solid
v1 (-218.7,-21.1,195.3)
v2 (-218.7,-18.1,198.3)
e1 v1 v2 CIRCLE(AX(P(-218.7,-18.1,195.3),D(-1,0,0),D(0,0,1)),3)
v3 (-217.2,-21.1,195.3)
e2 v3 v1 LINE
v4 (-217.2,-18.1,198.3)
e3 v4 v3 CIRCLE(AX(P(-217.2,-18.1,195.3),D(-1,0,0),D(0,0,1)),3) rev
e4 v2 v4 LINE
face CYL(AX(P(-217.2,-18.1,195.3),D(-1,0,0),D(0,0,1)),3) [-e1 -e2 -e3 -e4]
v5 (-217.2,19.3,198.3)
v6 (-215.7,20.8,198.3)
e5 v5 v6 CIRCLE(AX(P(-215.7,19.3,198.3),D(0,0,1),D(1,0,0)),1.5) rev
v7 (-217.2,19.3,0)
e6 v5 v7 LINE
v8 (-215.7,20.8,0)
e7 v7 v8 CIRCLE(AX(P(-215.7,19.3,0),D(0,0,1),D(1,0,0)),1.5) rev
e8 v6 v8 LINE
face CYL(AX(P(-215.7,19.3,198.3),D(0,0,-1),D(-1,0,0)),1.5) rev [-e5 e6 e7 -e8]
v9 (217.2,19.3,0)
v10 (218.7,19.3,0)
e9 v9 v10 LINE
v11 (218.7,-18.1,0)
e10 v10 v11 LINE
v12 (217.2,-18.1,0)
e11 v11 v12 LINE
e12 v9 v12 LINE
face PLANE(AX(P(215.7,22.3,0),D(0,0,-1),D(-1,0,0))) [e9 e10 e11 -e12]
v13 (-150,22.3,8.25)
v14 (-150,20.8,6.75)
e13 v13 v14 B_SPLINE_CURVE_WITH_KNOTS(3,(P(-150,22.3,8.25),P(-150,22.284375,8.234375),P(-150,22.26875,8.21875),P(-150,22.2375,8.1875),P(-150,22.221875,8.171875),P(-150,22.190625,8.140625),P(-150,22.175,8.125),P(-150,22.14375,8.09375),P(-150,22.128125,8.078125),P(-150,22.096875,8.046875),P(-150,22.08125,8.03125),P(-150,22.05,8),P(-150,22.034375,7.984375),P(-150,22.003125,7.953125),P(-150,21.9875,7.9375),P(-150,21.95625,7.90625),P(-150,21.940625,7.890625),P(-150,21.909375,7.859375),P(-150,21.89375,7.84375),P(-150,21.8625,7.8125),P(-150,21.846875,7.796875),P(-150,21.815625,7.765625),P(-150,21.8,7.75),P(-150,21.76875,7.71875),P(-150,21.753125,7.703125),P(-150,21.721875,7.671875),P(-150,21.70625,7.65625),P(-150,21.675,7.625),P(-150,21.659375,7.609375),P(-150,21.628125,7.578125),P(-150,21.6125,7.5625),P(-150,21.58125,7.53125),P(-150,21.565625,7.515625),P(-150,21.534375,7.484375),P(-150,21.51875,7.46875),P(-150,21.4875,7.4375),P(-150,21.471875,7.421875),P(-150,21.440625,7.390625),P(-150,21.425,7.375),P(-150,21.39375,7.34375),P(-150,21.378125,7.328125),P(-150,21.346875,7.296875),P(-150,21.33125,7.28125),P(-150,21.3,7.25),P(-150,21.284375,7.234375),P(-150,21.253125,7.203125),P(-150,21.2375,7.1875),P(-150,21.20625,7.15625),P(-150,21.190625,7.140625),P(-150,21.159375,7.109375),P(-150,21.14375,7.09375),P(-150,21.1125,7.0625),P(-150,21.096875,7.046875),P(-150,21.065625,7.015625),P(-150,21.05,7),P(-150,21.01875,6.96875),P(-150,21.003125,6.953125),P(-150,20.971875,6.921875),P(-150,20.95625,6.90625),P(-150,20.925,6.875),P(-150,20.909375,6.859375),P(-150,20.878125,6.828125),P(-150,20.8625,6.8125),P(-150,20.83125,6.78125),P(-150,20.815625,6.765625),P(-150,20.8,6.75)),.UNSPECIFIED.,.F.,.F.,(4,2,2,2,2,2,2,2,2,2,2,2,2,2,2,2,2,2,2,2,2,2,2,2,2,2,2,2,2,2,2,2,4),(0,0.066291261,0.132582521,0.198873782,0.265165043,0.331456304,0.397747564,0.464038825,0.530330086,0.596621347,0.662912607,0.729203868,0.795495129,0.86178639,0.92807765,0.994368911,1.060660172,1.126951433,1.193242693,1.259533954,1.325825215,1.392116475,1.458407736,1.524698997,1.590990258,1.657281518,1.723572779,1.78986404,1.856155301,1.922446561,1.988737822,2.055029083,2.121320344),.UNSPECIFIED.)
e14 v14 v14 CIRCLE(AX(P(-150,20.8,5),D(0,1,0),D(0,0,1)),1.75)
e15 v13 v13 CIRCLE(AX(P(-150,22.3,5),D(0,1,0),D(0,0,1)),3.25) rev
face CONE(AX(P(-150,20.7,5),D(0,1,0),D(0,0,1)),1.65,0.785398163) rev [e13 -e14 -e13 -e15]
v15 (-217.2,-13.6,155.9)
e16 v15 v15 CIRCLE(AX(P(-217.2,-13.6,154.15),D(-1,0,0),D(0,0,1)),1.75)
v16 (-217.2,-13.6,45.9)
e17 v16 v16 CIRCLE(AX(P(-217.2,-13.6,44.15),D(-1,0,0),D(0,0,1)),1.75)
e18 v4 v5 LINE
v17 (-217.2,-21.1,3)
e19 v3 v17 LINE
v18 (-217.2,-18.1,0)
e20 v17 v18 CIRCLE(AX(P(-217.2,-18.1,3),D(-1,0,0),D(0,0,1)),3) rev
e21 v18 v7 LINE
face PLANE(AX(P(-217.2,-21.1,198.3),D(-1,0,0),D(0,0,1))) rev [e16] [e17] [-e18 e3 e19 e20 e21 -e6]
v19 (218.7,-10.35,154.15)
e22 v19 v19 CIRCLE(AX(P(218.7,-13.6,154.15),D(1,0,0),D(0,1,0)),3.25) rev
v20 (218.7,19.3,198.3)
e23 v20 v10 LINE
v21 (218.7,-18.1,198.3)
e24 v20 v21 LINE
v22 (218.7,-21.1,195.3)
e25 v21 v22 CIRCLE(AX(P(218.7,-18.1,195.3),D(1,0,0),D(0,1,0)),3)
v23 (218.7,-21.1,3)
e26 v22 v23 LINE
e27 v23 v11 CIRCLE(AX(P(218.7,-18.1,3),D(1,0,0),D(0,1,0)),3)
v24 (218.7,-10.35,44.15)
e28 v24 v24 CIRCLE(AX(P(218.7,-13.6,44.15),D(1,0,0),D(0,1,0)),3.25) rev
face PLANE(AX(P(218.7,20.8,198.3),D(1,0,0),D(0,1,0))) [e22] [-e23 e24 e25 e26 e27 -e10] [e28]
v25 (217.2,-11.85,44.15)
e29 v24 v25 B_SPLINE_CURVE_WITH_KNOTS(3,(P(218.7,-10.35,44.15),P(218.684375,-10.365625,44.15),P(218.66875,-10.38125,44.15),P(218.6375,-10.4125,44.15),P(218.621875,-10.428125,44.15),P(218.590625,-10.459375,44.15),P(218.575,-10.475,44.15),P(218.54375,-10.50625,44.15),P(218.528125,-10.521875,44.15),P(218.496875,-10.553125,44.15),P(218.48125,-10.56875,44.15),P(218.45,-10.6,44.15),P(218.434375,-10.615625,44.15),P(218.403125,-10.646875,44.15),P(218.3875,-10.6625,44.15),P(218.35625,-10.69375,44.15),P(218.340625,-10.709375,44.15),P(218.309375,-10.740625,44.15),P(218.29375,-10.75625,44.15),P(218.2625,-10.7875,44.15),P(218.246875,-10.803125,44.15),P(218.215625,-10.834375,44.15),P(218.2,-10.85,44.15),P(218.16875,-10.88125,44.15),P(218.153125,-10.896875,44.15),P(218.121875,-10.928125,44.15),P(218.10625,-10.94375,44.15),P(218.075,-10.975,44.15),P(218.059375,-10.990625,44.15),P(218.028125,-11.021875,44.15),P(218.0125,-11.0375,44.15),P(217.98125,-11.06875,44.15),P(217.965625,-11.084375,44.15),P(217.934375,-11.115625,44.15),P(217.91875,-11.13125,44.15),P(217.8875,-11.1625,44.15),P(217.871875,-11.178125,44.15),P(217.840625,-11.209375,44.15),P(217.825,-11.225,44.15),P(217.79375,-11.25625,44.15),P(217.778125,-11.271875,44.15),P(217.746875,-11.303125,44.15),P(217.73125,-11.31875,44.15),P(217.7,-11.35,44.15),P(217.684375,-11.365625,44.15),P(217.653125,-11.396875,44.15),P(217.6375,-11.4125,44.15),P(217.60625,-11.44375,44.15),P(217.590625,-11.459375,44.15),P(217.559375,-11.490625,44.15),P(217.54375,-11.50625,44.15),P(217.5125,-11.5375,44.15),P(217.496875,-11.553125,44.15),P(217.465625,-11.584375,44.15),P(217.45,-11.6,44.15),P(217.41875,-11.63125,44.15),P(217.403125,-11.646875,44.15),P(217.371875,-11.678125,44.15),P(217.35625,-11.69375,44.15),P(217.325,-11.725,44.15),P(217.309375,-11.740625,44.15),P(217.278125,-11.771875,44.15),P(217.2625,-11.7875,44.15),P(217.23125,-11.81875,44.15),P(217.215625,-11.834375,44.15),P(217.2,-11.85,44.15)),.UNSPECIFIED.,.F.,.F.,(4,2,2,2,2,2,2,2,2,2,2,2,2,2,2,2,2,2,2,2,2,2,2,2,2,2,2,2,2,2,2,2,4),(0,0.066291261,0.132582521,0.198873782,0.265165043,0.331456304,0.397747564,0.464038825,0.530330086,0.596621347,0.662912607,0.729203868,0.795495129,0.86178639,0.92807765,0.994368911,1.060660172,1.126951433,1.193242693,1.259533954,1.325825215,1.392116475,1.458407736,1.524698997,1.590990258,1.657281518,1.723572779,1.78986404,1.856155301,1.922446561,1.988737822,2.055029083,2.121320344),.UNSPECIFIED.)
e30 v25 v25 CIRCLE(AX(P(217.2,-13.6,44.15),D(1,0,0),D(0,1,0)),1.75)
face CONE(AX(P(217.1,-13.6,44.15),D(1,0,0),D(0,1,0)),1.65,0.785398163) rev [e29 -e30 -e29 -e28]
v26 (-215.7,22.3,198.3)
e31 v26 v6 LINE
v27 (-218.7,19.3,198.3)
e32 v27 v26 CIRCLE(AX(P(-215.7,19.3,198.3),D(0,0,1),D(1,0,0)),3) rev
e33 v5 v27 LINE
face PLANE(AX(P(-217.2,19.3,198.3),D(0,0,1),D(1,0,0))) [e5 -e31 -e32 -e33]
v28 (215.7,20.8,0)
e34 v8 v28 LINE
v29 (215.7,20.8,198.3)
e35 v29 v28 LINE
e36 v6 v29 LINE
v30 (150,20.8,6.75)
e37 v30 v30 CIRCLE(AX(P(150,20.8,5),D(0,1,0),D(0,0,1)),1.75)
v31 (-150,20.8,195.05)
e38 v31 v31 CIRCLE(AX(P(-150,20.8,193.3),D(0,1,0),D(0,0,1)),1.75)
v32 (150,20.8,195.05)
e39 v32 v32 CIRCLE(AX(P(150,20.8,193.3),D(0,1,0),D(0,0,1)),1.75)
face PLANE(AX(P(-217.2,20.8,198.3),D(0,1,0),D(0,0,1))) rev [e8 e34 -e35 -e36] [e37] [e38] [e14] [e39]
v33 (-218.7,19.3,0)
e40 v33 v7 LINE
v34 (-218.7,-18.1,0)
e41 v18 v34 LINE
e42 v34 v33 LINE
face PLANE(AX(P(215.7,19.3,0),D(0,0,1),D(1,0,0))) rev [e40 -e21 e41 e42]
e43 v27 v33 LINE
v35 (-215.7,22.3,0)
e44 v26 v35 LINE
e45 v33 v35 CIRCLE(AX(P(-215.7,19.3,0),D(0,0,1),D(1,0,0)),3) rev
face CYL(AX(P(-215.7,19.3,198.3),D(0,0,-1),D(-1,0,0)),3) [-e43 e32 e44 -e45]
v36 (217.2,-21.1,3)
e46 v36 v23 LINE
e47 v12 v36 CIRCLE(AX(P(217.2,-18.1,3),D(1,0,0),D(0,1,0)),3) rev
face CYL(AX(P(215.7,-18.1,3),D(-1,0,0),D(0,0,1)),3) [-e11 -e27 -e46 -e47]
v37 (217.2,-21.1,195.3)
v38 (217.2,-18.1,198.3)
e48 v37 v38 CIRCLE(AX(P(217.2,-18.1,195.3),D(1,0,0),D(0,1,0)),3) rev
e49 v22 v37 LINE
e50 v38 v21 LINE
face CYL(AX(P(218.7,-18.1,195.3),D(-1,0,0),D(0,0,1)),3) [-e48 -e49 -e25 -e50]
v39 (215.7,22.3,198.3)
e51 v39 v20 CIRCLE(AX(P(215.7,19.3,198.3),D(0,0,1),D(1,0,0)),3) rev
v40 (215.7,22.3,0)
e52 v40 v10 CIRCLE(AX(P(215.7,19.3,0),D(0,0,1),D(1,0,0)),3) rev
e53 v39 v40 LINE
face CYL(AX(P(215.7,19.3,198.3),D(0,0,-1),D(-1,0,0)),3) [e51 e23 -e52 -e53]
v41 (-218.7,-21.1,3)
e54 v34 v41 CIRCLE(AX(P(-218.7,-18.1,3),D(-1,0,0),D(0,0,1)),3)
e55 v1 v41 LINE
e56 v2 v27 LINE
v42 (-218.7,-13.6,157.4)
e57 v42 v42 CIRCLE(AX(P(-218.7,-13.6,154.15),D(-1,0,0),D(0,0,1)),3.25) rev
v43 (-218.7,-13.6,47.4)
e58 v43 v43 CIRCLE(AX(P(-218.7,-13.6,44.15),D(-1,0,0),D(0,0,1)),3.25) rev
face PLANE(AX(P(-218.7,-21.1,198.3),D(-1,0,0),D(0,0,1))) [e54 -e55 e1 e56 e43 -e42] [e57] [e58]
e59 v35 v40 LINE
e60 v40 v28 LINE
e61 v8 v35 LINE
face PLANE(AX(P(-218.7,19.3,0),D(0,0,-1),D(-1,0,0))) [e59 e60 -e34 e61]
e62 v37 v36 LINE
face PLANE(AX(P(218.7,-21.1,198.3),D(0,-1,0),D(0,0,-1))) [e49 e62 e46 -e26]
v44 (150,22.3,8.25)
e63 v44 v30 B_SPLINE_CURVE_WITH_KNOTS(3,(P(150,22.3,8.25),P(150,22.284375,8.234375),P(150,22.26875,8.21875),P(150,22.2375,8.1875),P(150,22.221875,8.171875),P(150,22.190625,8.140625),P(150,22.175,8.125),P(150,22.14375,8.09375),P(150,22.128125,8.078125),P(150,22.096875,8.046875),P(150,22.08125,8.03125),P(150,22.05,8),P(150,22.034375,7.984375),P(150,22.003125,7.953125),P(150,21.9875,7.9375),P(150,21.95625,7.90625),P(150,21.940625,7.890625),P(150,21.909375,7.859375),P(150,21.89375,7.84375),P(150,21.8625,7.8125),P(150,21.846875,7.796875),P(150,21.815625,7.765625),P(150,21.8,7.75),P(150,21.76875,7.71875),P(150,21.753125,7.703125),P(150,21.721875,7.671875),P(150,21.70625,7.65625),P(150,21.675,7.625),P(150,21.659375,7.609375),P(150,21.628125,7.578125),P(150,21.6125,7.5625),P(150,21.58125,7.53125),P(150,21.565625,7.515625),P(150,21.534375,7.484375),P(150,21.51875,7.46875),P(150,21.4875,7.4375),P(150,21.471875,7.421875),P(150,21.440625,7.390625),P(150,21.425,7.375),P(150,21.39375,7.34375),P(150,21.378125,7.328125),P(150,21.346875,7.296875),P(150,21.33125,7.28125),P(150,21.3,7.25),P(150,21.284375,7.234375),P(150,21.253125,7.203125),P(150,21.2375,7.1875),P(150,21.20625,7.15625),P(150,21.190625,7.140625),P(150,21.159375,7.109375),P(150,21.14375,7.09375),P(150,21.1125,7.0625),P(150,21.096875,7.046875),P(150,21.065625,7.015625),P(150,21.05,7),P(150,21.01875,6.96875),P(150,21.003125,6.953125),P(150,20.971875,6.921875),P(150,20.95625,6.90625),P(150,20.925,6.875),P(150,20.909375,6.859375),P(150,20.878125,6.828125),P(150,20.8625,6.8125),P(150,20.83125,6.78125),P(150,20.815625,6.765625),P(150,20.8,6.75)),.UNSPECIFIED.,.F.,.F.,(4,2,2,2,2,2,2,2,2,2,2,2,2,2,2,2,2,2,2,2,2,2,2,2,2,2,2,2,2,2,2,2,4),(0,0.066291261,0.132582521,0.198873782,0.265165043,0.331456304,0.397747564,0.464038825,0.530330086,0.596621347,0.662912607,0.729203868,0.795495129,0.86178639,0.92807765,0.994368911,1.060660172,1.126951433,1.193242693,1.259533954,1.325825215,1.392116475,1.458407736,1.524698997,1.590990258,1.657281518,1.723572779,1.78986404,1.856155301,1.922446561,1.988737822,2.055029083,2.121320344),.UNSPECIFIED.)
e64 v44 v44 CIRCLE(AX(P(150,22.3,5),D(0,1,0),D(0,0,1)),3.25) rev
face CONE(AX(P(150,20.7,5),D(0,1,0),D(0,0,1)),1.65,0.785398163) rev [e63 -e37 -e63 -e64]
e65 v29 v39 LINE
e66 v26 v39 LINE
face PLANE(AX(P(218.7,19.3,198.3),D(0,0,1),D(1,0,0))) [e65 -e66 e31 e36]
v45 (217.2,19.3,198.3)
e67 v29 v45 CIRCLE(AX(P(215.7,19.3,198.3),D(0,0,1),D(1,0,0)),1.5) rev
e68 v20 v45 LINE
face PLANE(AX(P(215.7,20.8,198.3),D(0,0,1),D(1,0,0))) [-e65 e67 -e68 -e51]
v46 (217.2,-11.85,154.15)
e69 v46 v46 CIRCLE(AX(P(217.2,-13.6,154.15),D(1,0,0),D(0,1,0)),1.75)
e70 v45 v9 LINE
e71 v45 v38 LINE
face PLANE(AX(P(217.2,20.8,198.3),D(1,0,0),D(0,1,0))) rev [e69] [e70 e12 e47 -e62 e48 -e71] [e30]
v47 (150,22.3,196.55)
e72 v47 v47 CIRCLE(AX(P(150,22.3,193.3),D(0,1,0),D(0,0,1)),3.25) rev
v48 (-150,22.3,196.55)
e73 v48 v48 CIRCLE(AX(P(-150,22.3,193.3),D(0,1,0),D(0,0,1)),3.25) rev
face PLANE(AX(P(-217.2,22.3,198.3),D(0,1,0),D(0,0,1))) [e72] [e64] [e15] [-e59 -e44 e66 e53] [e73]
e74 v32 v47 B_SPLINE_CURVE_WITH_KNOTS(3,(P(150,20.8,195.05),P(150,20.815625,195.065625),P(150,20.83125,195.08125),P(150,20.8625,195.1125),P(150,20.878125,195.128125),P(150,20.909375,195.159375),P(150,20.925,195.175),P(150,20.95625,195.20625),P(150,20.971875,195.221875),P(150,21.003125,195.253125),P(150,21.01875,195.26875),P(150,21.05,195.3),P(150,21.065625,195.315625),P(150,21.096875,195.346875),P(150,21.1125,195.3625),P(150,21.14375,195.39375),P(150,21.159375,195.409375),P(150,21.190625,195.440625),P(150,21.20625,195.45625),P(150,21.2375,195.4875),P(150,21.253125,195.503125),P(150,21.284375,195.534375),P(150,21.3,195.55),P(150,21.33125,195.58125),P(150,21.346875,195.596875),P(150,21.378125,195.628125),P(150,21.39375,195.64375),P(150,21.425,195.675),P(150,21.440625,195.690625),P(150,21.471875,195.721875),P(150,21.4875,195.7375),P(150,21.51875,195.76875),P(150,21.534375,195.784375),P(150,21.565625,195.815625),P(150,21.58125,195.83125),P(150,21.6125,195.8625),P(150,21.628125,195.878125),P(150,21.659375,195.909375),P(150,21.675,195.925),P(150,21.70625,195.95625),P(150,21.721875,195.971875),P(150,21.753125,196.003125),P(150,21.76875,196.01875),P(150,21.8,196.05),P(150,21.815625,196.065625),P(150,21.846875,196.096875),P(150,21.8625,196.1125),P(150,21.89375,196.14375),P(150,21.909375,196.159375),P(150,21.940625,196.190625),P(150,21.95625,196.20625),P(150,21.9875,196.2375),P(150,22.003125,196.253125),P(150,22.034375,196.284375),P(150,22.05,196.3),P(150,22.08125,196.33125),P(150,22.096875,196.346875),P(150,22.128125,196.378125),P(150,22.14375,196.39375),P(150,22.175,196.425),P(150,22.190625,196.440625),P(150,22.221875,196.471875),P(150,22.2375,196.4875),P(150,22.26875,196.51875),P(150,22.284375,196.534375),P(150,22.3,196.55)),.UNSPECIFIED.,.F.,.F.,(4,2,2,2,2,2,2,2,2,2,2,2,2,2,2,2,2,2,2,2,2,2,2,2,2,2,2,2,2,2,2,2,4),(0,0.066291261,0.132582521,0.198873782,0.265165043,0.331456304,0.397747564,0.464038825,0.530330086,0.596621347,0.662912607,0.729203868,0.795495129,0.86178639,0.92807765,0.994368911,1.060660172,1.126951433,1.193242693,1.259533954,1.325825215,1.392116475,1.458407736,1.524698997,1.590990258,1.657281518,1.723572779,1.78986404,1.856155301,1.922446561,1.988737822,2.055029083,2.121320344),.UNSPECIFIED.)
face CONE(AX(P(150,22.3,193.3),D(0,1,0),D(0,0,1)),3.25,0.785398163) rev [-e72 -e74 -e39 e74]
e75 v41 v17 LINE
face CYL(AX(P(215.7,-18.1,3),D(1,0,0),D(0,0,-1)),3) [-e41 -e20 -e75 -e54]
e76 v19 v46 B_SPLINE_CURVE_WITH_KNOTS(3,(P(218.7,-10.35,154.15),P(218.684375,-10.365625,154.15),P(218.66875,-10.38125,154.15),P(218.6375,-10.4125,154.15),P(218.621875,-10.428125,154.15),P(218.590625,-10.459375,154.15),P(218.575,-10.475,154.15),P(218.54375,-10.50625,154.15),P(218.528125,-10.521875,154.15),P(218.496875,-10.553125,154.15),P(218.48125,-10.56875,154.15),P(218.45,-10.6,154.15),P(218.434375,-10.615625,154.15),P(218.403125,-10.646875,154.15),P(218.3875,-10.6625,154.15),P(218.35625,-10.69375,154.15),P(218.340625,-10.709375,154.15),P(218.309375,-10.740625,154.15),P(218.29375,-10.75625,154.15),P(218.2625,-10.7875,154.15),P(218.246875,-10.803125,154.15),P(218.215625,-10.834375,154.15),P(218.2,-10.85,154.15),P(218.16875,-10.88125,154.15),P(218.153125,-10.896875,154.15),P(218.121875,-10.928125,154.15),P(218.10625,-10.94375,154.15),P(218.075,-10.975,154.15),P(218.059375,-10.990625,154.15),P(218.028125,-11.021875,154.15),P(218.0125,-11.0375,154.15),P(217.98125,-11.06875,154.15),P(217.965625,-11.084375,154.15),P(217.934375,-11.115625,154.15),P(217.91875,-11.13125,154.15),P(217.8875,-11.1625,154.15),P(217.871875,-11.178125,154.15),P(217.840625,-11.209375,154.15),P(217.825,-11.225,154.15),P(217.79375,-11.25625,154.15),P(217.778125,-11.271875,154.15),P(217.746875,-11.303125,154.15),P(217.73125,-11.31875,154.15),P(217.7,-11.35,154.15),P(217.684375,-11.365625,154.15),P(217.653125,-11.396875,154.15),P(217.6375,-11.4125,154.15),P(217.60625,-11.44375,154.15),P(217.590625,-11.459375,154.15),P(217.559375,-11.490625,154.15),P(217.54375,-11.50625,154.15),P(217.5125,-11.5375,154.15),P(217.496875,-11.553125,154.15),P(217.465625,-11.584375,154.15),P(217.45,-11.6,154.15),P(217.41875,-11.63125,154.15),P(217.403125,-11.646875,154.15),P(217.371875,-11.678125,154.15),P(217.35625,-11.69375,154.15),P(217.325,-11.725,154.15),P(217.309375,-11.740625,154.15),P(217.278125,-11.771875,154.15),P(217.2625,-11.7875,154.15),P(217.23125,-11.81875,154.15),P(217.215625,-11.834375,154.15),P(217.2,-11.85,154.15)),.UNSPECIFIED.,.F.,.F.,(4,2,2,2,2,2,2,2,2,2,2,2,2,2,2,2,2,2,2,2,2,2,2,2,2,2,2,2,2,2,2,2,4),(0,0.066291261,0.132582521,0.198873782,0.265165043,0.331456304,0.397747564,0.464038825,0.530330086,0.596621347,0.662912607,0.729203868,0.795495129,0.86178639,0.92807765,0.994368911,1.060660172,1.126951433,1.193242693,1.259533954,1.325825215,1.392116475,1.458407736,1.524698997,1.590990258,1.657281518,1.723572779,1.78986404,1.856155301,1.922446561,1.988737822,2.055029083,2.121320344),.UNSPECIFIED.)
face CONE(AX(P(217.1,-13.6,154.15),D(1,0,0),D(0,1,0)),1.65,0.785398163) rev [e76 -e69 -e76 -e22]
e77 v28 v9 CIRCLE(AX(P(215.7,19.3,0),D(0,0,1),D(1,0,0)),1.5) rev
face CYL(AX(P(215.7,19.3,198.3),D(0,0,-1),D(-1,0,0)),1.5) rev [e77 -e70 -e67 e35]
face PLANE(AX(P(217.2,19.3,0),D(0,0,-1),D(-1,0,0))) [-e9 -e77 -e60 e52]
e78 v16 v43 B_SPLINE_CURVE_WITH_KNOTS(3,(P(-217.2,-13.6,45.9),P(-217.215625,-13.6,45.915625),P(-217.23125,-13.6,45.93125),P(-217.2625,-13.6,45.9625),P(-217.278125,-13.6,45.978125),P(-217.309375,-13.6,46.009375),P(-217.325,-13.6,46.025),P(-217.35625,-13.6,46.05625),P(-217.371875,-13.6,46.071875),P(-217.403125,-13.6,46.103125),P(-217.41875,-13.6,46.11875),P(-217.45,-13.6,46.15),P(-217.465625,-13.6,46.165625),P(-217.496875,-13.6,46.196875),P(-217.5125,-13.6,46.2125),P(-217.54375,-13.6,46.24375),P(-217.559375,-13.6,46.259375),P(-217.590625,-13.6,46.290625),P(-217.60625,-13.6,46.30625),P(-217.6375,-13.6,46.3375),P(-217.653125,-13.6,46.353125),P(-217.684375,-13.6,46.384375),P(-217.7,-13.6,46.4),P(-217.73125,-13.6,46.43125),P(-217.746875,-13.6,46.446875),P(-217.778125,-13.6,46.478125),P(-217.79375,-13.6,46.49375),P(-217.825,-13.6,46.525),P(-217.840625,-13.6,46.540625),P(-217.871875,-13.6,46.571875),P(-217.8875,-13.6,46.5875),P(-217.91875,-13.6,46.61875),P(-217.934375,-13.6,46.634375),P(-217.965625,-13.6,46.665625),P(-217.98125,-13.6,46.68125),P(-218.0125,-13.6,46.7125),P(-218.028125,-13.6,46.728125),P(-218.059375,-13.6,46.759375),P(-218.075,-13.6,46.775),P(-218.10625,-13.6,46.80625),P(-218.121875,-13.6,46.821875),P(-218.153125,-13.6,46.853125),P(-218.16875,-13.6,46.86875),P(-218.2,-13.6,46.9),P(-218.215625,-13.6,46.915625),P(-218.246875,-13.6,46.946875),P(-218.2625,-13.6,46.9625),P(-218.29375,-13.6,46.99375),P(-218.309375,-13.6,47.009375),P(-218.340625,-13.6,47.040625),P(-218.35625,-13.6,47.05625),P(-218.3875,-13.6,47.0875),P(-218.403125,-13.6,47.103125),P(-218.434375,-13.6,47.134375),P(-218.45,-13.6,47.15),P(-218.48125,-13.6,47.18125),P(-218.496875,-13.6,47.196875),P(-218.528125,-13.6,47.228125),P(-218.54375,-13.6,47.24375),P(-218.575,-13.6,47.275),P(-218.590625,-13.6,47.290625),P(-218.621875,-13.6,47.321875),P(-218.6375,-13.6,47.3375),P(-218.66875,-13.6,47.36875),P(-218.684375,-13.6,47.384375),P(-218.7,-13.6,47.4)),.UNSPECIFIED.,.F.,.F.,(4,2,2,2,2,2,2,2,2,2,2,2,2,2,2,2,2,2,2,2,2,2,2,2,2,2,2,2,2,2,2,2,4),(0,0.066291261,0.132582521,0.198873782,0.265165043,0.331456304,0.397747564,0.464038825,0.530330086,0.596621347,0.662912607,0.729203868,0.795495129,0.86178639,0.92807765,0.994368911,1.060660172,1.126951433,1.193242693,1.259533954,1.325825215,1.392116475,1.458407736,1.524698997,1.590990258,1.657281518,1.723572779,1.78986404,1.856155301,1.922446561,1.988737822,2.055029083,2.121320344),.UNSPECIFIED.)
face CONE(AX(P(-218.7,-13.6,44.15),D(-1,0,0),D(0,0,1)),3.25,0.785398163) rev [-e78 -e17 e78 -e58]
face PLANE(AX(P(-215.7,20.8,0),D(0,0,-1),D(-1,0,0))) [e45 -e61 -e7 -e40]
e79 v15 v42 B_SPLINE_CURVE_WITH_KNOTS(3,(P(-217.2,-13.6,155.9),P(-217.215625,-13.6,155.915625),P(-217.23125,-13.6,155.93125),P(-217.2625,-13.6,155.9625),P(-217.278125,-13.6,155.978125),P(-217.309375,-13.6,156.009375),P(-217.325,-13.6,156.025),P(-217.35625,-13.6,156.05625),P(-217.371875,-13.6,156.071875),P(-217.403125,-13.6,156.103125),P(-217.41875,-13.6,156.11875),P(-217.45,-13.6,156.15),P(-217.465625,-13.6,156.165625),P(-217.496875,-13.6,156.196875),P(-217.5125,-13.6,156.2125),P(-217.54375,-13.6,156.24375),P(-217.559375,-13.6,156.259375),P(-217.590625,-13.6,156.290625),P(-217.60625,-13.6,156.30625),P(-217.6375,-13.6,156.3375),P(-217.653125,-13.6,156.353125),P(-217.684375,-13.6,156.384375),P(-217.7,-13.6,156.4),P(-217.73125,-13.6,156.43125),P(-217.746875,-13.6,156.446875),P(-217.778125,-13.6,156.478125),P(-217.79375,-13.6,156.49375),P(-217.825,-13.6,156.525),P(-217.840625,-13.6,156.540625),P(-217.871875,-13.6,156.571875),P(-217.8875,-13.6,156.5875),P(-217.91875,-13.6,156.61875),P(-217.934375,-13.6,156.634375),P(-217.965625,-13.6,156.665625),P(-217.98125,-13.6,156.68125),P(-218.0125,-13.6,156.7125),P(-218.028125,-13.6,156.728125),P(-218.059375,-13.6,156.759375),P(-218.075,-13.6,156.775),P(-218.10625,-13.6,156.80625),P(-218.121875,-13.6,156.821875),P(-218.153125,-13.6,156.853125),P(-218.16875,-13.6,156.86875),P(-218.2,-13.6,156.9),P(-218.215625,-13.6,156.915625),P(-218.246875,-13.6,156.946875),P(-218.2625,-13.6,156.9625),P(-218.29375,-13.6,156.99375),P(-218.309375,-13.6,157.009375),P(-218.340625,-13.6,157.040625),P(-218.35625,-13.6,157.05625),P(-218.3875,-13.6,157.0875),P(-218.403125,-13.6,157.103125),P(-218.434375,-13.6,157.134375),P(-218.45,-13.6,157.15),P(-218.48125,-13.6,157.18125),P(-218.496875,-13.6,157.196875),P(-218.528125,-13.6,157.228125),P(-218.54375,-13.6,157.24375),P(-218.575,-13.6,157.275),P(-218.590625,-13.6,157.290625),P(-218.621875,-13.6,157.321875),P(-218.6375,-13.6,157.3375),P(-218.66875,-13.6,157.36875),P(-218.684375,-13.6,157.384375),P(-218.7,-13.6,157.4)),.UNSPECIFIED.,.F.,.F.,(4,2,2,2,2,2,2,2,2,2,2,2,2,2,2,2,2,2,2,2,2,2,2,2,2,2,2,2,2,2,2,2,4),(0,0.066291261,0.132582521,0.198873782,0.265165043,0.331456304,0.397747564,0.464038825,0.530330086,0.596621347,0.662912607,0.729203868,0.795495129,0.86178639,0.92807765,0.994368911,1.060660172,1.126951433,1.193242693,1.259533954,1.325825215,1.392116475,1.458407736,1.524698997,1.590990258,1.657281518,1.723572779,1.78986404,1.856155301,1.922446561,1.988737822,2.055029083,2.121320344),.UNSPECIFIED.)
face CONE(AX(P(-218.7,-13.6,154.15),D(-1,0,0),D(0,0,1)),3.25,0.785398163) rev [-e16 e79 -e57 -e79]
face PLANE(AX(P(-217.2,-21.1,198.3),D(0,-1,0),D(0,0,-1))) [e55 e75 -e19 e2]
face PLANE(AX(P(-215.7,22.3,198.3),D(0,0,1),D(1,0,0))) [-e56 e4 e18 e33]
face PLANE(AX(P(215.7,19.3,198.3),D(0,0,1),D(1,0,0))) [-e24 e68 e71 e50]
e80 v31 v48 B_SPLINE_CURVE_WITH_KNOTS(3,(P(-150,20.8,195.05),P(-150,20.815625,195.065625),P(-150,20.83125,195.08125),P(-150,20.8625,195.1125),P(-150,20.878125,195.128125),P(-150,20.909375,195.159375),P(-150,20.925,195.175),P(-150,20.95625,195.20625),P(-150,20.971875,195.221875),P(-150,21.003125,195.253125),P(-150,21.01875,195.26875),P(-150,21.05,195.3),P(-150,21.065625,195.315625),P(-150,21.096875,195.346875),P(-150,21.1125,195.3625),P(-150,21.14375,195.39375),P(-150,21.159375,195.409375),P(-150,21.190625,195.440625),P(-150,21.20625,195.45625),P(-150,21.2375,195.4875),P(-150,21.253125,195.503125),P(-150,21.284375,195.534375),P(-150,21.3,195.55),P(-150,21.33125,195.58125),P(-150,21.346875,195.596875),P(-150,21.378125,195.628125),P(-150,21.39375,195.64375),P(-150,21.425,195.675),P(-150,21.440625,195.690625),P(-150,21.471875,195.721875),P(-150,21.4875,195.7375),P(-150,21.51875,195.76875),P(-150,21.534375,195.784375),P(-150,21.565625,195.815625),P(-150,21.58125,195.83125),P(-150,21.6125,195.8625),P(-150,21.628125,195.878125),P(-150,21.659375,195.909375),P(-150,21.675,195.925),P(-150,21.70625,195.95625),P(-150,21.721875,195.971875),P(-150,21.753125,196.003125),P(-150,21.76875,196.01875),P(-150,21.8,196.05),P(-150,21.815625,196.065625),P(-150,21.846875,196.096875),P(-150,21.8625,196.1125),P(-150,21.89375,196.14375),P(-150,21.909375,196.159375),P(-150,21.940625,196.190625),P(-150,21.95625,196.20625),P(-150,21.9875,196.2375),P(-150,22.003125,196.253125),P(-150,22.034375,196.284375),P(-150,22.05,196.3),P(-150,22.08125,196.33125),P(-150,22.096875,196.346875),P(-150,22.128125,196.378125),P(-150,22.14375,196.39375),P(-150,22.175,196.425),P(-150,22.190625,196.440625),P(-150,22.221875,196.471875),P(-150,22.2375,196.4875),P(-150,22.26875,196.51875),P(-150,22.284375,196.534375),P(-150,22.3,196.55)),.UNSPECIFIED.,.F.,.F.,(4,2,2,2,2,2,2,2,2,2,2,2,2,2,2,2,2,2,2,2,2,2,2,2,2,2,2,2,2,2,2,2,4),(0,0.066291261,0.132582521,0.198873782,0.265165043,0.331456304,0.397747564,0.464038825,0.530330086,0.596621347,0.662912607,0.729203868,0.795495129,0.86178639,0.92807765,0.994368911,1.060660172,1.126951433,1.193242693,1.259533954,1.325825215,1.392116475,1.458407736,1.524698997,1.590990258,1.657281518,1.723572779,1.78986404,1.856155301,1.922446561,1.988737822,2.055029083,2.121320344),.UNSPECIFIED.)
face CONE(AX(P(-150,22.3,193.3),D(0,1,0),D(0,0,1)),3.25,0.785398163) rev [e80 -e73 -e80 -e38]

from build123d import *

# Parameters (mm, degrees)
SM_BASE_FLANGE_1_DEPTH = 198.3
FILLET_1_R             = 3
SKETCH_6_R             = 1.65
CUT_EXTRUDE_1_DEPTH    = 299.389242433
CUT_EXTRUDE_2_REACH    = 482.769
SKETCH_7_R             = 1.65
CHAMFER_2_SIZE         = 1.6


# Sheet-metal steps are written as plain solids
with BuildPart() as part:
    # Sketch 1 → Базовая кромка1 (new body)
    with BuildSketch(Plane.XY):
        with BuildLine():
            Line((-217.2, -21.1), (-217.2, 19.3))
            ThreePointArc((-217.2, 19.3), (-216.760660172, 20.360660172), (-215.7, 20.8))
            Line((-215.7, 20.8), (215.7, 20.8))
            ThreePointArc((215.7, 20.8), (216.760660172, 20.360660172), (217.2, 19.3))
            Line((217.2, 19.3), (217.2, -21.1))
            Line((217.2, -21.1), (218.7, -21.1))
            Line((218.7, -21.1), (218.7, 19.3))
            ThreePointArc((218.7, 19.3), (217.821320344, 21.421320344), (215.7, 22.3))
            Line((215.7, 22.3), (-215.7, 22.3))
            ThreePointArc((-215.7, 22.3), (-217.821320344, 21.421320344), (-218.7, 19.3))
            Line((-218.7, 19.3), (-218.7, -21.1))
            Line((-218.7, -21.1), (-217.2, -21.1))
        make_face()
    extrude(amount=SM_BASE_FLANGE_1_DEPTH)

    # Скругление1
    fillet_1_edges = [part.edges().sort_by_distance(p)[0] for p in [
        (-217.95, -21.1, 0),
        (217.95, -21.1, 0),
        (-217.95, -21.1, 198.3),
        (217.95, -21.1, 198.3),
    ]]
    fillet(fillet_1_edges, radius=FILLET_1_R)

    # Эскиз6 → Вырез-Вытянуть1 (cut, through all)
    with BuildSketch(Plane(origin=(0, 22.3, 0), x_dir=(1, 0, 0), z_dir=(0, 1, 0))):
        with Locations(Location((-150, -5, 0), (0, 0, 270))):
            Circle(SKETCH_6_R)
        with Locations(Location((150, -5, 0), (0, 0, 270))):
            Circle(SKETCH_6_R)
    cut_extrude_1 = extrude(amount=-CUT_EXTRUDE_1_DEPTH, mode=Mode.SUBTRACT)

    # Зеркальное отражение1: Вырез-Вытянуть1 across plane
    add(cut_extrude_1.mirror(Plane(origin=(0, 0, 99.15), x_dir=(1, 0, 0), z_dir=(0, 0, -1))), mode=Mode.SUBTRACT)

    # Вырез-Вытянуть2: up to this face of the body (flat: up to its plane)
    cut_extrude_2_end = Plane(part.part.faces().sort_by_distance((-218.7, -0.890578691, 99.15))[0])
    # Эскиз7 → Вырез-Вытянуть2 (cut, up to the picked face)
    with BuildSketch(Plane(origin=(218.7, 0, 0), x_dir=(0, 0, -1), z_dir=(1, 0, 0)), mode=Mode.PRIVATE) as cut_extrude_2_sk1:
        with Locations(Location((-154.15, -13.6, 0), (0, 0, 90))):
            Circle(SKETCH_7_R)
    cut_extrude_2_tool1 = split(extrude(cut_extrude_2_sk1.sketch, amount=-CUT_EXTRUDE_2_REACH, mode=Mode.PRIVATE), bisect_by=cut_extrude_2_end, keep=Keep.BOTH, mode=Mode.PRIVATE)
    # Эскиз7 → Вырез-Вытянуть2 (cut, up to the picked face)
    with BuildSketch(Plane(origin=(218.7, 0, 0), x_dir=(0, 0, -1), z_dir=(1, 0, 0)), mode=Mode.PRIVATE) as cut_extrude_2_sk2:
        with Locations(Location((-44.15, -13.6, 0), (0, 0, 90))):
            Circle(SKETCH_7_R)
    cut_extrude_2_tool2 = split(extrude(cut_extrude_2_sk2.sketch, amount=-CUT_EXTRUDE_2_REACH, mode=Mode.PRIVATE), bisect_by=cut_extrude_2_end, keep=Keep.BOTH, mode=Mode.PRIVATE)
    add(cut_extrude_2_tool1.solids().sort_by(Axis((218.7, -13.6, 154.15), (-1, 0, 0)))[0], mode=Mode.SUBTRACT)
    add(cut_extrude_2_tool2.solids().sort_by(Axis((218.7, -13.6, 44.15), (-1, 0, 0)))[0], mode=Mode.SUBTRACT)

    # Фаска2
    # the kernel refuses this chamfer: 1.6 mm, written as the material it takes off along each edge
    with BuildSketch(Plane(origin=(-218.7, -13.6, 44.15), x_dir=(0, 1, 0), z_dir=(0, 0, -1))) as chamfer_2_piece_1:
        Polygon((1.65 + CHAMFER_2_SIZE, 0), (1.65, CHAMFER_2_SIZE), (1.65, 0), align=None)
    revolve(axis=Axis((-218.7, -13.6, 44.15), (1, 0, 0)), mode=Mode.SUBTRACT)
    with BuildSketch(Plane(origin=(-218.7, -13.6, 154.15), x_dir=(0, 1, 0), z_dir=(0, 0, -1))) as chamfer_2_piece_2:
        Polygon((1.65 + CHAMFER_2_SIZE, 0), (1.65, CHAMFER_2_SIZE), (1.65, 0), align=None)
    revolve(axis=Axis((-218.7, -13.6, 154.15), (1, 0, 0)), mode=Mode.SUBTRACT)
    with BuildSketch(Plane(origin=(-150, 22.3, 193.3), x_dir=(0, 0, -1), z_dir=(-1, 0, 0))) as chamfer_2_piece_3:
        Polygon((1.65 + CHAMFER_2_SIZE, 0), (1.65, CHAMFER_2_SIZE), (1.65, 0), align=None)
    revolve(axis=Axis((-150, 22.3, 193.3), (0, -1, 0)), mode=Mode.SUBTRACT)
    with BuildSketch(Plane(origin=(-150, 22.3, 5), x_dir=(0, 0, 1), z_dir=(-1, 0, 0))) as chamfer_2_piece_4:
        Polygon((1.65 + CHAMFER_2_SIZE, 0), (1.65, -CHAMFER_2_SIZE), (1.65, 0), align=None)
    revolve(axis=Axis((-150, 22.3, 5), (0, 1, 0)), mode=Mode.SUBTRACT)
    with BuildSketch(Plane(origin=(150, 22.3, 5), x_dir=(0, 0, 1), z_dir=(-1, 0, 0))) as chamfer_2_piece_5:
        Polygon((1.65 + CHAMFER_2_SIZE, 0), (1.65, -CHAMFER_2_SIZE), (1.65, 0), align=None)
    revolve(axis=Axis((150, 22.3, 5), (0, 1, 0)), mode=Mode.SUBTRACT)
    with BuildSketch(Plane(origin=(218.7, -13.6, 44.15), x_dir=(0, 1, 0), z_dir=(0, 0, -1))) as chamfer_2_piece_6:
        Polygon((1.65 + CHAMFER_2_SIZE, 0), (1.65, -CHAMFER_2_SIZE), (1.65, 0), align=None)
    revolve(axis=Axis((218.7, -13.6, 44.15), (1, 0, 0)), mode=Mode.SUBTRACT)
    with BuildSketch(Plane(origin=(218.7, -13.6, 154.15), x_dir=(0, 1, 0), z_dir=(0, 0, -1))) as chamfer_2_piece_7:
        Polygon((1.65 + CHAMFER_2_SIZE, 0), (1.65, -CHAMFER_2_SIZE), (1.65, 0), align=None)
    revolve(axis=Axis((218.7, -13.6, 154.15), (1, 0, 0)), mode=Mode.SUBTRACT)
    with BuildSketch(Plane(origin=(150, 22.3, 193.3), x_dir=(0, 0, -1), z_dir=(-1, 0, 0))) as chamfer_2_piece_8:
        Polygon((1.65 + CHAMFER_2_SIZE, 0), (1.65, CHAMFER_2_SIZE), (1.65, 0), align=None)
    revolve(axis=Axis((150, 22.3, 193.3), (0, -1, 0)), mode=Mode.SUBTRACT)


solid = part.part
